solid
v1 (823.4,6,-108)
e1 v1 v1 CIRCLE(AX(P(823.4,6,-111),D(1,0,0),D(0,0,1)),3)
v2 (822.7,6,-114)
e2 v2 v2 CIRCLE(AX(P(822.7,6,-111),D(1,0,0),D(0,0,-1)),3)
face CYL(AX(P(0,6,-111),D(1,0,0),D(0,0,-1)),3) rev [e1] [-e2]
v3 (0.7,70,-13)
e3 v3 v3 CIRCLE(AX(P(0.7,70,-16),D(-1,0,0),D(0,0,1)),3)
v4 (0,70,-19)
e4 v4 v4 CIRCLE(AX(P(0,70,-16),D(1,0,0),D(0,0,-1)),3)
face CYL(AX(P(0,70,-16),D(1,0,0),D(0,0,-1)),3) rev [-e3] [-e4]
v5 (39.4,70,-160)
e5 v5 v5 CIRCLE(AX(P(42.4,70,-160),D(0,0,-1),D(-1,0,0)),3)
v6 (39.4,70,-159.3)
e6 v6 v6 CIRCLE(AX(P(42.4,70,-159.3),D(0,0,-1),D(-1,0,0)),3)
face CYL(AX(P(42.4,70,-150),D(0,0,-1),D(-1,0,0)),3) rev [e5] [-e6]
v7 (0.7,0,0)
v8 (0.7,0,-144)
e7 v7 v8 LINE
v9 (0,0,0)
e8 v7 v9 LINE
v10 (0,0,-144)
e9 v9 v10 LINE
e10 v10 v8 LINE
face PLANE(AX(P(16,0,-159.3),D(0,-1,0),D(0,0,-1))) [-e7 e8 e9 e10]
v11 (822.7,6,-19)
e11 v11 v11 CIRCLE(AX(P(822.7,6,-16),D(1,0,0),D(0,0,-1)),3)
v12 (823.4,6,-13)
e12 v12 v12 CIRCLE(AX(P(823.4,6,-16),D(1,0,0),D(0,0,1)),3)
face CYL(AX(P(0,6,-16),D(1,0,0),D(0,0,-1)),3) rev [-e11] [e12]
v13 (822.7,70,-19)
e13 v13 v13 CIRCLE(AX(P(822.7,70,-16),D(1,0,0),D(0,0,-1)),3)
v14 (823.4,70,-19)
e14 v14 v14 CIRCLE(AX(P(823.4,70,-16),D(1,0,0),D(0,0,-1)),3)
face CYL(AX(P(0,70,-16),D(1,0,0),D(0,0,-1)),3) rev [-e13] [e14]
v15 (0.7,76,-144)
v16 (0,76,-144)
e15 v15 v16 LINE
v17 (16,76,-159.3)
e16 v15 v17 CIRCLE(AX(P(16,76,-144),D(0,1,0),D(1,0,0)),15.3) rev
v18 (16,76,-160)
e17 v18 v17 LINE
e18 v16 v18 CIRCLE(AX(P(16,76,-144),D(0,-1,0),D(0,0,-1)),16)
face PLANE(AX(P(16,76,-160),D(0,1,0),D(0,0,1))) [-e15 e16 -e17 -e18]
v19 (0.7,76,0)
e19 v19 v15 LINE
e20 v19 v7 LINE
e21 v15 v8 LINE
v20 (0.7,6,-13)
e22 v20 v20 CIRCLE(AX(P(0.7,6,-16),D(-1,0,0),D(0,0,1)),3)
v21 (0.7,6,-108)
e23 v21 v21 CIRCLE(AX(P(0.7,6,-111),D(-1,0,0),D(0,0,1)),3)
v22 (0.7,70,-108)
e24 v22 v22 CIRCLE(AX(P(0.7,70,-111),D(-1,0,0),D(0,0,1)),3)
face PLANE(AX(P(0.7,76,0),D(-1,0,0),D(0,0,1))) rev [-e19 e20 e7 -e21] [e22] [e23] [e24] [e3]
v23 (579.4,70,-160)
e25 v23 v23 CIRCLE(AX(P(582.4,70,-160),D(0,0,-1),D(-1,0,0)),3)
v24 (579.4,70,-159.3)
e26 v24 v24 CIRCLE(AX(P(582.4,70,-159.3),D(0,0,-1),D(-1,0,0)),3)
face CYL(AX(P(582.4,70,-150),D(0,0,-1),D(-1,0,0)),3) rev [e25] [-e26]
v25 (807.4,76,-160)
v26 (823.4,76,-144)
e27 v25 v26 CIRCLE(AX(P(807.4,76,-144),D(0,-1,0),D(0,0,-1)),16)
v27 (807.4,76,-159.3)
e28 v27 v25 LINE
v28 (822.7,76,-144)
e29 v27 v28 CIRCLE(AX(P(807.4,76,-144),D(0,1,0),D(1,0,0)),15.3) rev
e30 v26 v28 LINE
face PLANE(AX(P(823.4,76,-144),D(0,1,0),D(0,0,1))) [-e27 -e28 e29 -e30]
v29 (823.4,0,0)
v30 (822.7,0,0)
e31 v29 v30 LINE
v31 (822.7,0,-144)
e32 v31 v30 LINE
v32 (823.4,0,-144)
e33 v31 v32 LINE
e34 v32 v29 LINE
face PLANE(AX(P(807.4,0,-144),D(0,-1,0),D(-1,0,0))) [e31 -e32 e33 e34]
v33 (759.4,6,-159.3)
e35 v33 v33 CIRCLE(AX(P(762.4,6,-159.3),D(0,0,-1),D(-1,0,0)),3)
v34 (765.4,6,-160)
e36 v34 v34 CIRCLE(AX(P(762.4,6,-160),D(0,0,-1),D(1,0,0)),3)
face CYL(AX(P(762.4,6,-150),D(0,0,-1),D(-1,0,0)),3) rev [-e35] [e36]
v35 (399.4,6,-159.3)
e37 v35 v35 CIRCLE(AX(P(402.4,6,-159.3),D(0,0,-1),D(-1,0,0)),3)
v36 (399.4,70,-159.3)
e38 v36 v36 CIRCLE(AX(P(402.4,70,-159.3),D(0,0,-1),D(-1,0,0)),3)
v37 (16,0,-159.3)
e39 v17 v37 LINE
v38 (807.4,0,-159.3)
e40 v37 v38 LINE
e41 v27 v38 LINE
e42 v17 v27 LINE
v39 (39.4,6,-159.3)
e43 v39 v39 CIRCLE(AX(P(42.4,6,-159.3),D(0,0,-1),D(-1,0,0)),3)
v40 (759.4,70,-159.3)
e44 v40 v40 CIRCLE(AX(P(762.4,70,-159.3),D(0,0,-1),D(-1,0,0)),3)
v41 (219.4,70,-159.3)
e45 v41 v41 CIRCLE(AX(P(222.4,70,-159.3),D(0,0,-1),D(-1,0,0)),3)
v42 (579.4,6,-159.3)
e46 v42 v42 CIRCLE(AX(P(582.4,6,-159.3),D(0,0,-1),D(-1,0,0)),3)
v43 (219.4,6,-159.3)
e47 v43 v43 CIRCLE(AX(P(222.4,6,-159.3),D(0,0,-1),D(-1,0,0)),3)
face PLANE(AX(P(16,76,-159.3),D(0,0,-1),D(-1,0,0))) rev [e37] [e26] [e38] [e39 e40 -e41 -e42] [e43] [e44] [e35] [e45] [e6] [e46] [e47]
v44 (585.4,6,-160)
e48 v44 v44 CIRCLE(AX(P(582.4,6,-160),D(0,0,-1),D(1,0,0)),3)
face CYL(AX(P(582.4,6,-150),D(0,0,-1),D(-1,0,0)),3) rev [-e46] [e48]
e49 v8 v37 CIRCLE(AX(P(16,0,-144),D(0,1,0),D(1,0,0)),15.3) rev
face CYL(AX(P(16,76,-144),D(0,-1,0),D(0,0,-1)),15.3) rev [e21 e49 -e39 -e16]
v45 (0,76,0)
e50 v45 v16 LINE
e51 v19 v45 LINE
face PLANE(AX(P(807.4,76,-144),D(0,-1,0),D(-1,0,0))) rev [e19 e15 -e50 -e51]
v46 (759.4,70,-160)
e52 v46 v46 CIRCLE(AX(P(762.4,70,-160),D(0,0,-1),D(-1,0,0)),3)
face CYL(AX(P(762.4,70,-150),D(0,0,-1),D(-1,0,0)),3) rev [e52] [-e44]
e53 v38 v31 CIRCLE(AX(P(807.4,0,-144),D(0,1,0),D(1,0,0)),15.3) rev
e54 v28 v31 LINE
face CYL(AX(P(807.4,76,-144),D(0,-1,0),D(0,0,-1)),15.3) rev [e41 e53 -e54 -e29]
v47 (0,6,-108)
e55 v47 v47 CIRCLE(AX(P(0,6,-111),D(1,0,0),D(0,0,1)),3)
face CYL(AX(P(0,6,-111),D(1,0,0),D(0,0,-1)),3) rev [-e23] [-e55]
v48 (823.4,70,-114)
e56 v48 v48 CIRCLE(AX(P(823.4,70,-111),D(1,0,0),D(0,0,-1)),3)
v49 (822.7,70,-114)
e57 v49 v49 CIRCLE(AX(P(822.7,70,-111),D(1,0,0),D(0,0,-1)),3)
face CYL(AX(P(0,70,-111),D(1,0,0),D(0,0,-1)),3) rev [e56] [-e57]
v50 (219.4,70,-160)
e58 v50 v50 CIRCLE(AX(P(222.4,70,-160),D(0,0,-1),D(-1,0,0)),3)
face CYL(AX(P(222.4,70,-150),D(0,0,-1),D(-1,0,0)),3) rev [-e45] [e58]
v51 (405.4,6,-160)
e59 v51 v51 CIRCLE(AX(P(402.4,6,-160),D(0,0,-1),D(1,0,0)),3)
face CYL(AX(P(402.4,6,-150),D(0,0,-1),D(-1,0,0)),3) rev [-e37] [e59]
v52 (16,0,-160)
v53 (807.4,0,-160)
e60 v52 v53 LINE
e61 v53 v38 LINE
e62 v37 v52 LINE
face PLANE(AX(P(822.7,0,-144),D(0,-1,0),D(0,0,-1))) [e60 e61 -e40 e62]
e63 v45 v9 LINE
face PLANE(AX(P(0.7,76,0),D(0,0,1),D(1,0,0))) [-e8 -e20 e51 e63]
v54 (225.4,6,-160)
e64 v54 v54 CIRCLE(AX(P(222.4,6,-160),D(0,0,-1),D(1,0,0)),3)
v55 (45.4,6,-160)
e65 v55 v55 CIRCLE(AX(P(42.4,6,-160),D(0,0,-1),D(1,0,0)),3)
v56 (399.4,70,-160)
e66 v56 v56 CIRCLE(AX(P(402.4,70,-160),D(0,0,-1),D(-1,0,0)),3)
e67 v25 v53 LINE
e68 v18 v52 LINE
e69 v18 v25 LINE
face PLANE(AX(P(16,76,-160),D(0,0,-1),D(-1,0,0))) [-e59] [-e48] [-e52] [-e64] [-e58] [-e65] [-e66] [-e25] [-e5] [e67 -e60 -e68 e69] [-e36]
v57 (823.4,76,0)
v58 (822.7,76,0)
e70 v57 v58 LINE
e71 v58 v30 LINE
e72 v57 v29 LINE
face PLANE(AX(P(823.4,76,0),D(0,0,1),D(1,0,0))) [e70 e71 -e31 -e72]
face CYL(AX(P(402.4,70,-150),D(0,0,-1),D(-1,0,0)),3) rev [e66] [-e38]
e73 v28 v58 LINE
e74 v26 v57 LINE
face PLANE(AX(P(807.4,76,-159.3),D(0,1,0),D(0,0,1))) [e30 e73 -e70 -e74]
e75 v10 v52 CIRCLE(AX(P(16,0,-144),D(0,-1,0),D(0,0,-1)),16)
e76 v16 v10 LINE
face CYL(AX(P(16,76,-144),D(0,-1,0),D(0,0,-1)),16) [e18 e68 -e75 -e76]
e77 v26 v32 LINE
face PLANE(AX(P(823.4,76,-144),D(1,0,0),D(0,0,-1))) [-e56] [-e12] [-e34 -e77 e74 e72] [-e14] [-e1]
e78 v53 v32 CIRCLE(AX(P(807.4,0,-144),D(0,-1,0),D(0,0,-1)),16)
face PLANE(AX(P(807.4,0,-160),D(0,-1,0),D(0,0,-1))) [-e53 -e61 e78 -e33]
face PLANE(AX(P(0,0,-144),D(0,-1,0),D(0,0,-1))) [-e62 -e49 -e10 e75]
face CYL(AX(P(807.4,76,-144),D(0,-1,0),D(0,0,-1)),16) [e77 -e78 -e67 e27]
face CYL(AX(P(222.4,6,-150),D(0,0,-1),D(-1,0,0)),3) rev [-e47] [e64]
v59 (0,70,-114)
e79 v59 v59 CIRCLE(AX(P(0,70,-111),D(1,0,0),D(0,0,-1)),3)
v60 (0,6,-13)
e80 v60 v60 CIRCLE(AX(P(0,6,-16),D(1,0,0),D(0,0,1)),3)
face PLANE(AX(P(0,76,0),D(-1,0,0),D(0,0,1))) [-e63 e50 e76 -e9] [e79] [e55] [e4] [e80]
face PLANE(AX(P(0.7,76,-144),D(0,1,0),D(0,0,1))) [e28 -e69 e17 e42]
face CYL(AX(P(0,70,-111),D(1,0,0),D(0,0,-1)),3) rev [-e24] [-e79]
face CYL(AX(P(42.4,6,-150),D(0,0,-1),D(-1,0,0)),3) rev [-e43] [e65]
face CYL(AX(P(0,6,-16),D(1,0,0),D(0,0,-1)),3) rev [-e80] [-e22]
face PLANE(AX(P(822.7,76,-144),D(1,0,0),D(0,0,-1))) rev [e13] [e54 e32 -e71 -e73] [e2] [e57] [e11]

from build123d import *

# Parameters (mm, degrees)
BASE_FLANGE1_DEPTH = 76
SKETCH2_R          = 3
CUT_EXTRUDE1_DEPTH = 843.237234988
SKETCH3_R          = 3
CUT_EXTRUDE2_DEPTH = 10


# Read off the part's stored shape, not the designer's step: Base-Flange1
with BuildPart() as part:
    # Base-Flange1 outline → Base-Flange1 (new body)
    with BuildSketch(Plane(origin=(0, 0, 0), x_dir=(1, 0, 0), z_dir=(0, 1, 0))):
        with BuildLine():
            Line((822.7, 144), (822.7, 0))
            Line((822.7, 0), (823.4, 0))
            Line((823.4, 0), (823.4, 144))
            ThreePointArc((823.4, 144), (818.713708499, 155.313708499), (807.4, 160))
            Line((807.4, 160), (16, 160))
            ThreePointArc((16, 160), (4.686291501, 155.313708499), (0, 144))
            Line((0, 144), (0, 0))
            Line((0, 0), (0.7, 0))
            Line((0.7, 0), (0.7, 144))
            ThreePointArc((0.7, 144), (5.181266248, 154.818733752), (16, 159.3))
            Line((16, 159.3), (807.4, 159.3))
            ThreePointArc((807.4, 159.3), (818.218733752, 154.818733752), (822.7, 144))
        make_face()
    extrude(amount=BASE_FLANGE1_DEPTH)

    # Sketch2 → Cut-Extrude1 (cut, through all)
    with BuildSketch(Plane(origin=(823.4, 0, 0), x_dir=(0, 0, -1), z_dir=(1, 0, 0))):
        with Locations((16, 70)):
            Circle(SKETCH2_R)
        with Locations((111, 70)):
            Circle(SKETCH2_R)
        with Locations(Location((111, 6, 0), (0, 0, 180))):
            Circle(SKETCH2_R)
        with Locations(Location((16, 6, 0), (0, 0, 180))):
            Circle(SKETCH2_R)
    extrude(amount=-CUT_EXTRUDE1_DEPTH, mode=Mode.SUBTRACT)

    # Sketch3 → Cut-Extrude2 (cut)
    with BuildSketch(Plane(origin=(0, 0, -160), x_dir=(-1, 0, 0), z_dir=(0, 0, -1))):
        with Locations((-762.4, 70)):
            Circle(SKETCH3_R)
        with Locations((-582.4, 70)):
            Circle(SKETCH3_R)
        with Locations((-402.4, 70)):
            Circle(SKETCH3_R)
        with Locations((-222.4, 70)):
            Circle(SKETCH3_R)
        with Locations((-42.4, 70)):
            Circle(SKETCH3_R)
        with Locations((137.6, 70)):
            Circle(SKETCH3_R)
        with Locations((317.6, 70)):
            Circle(SKETCH3_R)
        with Locations((317.6, 6)):
            Circle(SKETCH3_R)
        with Locations((137.6, 6)):
            Circle(SKETCH3_R)
        with Locations((-42.4, 6)):
            Circle(SKETCH3_R)
        with Locations((-222.4, 6)):
            Circle(SKETCH3_R)
        with Locations((-402.4, 6)):
            Circle(SKETCH3_R)
        with Locations((-582.4, 6)):
            Circle(SKETCH3_R)
        with Locations((-762.4, 6)):
            Circle(SKETCH3_R)
    extrude(amount=-CUT_EXTRUDE2_DEPTH, mode=Mode.SUBTRACT)


solid = part.part
